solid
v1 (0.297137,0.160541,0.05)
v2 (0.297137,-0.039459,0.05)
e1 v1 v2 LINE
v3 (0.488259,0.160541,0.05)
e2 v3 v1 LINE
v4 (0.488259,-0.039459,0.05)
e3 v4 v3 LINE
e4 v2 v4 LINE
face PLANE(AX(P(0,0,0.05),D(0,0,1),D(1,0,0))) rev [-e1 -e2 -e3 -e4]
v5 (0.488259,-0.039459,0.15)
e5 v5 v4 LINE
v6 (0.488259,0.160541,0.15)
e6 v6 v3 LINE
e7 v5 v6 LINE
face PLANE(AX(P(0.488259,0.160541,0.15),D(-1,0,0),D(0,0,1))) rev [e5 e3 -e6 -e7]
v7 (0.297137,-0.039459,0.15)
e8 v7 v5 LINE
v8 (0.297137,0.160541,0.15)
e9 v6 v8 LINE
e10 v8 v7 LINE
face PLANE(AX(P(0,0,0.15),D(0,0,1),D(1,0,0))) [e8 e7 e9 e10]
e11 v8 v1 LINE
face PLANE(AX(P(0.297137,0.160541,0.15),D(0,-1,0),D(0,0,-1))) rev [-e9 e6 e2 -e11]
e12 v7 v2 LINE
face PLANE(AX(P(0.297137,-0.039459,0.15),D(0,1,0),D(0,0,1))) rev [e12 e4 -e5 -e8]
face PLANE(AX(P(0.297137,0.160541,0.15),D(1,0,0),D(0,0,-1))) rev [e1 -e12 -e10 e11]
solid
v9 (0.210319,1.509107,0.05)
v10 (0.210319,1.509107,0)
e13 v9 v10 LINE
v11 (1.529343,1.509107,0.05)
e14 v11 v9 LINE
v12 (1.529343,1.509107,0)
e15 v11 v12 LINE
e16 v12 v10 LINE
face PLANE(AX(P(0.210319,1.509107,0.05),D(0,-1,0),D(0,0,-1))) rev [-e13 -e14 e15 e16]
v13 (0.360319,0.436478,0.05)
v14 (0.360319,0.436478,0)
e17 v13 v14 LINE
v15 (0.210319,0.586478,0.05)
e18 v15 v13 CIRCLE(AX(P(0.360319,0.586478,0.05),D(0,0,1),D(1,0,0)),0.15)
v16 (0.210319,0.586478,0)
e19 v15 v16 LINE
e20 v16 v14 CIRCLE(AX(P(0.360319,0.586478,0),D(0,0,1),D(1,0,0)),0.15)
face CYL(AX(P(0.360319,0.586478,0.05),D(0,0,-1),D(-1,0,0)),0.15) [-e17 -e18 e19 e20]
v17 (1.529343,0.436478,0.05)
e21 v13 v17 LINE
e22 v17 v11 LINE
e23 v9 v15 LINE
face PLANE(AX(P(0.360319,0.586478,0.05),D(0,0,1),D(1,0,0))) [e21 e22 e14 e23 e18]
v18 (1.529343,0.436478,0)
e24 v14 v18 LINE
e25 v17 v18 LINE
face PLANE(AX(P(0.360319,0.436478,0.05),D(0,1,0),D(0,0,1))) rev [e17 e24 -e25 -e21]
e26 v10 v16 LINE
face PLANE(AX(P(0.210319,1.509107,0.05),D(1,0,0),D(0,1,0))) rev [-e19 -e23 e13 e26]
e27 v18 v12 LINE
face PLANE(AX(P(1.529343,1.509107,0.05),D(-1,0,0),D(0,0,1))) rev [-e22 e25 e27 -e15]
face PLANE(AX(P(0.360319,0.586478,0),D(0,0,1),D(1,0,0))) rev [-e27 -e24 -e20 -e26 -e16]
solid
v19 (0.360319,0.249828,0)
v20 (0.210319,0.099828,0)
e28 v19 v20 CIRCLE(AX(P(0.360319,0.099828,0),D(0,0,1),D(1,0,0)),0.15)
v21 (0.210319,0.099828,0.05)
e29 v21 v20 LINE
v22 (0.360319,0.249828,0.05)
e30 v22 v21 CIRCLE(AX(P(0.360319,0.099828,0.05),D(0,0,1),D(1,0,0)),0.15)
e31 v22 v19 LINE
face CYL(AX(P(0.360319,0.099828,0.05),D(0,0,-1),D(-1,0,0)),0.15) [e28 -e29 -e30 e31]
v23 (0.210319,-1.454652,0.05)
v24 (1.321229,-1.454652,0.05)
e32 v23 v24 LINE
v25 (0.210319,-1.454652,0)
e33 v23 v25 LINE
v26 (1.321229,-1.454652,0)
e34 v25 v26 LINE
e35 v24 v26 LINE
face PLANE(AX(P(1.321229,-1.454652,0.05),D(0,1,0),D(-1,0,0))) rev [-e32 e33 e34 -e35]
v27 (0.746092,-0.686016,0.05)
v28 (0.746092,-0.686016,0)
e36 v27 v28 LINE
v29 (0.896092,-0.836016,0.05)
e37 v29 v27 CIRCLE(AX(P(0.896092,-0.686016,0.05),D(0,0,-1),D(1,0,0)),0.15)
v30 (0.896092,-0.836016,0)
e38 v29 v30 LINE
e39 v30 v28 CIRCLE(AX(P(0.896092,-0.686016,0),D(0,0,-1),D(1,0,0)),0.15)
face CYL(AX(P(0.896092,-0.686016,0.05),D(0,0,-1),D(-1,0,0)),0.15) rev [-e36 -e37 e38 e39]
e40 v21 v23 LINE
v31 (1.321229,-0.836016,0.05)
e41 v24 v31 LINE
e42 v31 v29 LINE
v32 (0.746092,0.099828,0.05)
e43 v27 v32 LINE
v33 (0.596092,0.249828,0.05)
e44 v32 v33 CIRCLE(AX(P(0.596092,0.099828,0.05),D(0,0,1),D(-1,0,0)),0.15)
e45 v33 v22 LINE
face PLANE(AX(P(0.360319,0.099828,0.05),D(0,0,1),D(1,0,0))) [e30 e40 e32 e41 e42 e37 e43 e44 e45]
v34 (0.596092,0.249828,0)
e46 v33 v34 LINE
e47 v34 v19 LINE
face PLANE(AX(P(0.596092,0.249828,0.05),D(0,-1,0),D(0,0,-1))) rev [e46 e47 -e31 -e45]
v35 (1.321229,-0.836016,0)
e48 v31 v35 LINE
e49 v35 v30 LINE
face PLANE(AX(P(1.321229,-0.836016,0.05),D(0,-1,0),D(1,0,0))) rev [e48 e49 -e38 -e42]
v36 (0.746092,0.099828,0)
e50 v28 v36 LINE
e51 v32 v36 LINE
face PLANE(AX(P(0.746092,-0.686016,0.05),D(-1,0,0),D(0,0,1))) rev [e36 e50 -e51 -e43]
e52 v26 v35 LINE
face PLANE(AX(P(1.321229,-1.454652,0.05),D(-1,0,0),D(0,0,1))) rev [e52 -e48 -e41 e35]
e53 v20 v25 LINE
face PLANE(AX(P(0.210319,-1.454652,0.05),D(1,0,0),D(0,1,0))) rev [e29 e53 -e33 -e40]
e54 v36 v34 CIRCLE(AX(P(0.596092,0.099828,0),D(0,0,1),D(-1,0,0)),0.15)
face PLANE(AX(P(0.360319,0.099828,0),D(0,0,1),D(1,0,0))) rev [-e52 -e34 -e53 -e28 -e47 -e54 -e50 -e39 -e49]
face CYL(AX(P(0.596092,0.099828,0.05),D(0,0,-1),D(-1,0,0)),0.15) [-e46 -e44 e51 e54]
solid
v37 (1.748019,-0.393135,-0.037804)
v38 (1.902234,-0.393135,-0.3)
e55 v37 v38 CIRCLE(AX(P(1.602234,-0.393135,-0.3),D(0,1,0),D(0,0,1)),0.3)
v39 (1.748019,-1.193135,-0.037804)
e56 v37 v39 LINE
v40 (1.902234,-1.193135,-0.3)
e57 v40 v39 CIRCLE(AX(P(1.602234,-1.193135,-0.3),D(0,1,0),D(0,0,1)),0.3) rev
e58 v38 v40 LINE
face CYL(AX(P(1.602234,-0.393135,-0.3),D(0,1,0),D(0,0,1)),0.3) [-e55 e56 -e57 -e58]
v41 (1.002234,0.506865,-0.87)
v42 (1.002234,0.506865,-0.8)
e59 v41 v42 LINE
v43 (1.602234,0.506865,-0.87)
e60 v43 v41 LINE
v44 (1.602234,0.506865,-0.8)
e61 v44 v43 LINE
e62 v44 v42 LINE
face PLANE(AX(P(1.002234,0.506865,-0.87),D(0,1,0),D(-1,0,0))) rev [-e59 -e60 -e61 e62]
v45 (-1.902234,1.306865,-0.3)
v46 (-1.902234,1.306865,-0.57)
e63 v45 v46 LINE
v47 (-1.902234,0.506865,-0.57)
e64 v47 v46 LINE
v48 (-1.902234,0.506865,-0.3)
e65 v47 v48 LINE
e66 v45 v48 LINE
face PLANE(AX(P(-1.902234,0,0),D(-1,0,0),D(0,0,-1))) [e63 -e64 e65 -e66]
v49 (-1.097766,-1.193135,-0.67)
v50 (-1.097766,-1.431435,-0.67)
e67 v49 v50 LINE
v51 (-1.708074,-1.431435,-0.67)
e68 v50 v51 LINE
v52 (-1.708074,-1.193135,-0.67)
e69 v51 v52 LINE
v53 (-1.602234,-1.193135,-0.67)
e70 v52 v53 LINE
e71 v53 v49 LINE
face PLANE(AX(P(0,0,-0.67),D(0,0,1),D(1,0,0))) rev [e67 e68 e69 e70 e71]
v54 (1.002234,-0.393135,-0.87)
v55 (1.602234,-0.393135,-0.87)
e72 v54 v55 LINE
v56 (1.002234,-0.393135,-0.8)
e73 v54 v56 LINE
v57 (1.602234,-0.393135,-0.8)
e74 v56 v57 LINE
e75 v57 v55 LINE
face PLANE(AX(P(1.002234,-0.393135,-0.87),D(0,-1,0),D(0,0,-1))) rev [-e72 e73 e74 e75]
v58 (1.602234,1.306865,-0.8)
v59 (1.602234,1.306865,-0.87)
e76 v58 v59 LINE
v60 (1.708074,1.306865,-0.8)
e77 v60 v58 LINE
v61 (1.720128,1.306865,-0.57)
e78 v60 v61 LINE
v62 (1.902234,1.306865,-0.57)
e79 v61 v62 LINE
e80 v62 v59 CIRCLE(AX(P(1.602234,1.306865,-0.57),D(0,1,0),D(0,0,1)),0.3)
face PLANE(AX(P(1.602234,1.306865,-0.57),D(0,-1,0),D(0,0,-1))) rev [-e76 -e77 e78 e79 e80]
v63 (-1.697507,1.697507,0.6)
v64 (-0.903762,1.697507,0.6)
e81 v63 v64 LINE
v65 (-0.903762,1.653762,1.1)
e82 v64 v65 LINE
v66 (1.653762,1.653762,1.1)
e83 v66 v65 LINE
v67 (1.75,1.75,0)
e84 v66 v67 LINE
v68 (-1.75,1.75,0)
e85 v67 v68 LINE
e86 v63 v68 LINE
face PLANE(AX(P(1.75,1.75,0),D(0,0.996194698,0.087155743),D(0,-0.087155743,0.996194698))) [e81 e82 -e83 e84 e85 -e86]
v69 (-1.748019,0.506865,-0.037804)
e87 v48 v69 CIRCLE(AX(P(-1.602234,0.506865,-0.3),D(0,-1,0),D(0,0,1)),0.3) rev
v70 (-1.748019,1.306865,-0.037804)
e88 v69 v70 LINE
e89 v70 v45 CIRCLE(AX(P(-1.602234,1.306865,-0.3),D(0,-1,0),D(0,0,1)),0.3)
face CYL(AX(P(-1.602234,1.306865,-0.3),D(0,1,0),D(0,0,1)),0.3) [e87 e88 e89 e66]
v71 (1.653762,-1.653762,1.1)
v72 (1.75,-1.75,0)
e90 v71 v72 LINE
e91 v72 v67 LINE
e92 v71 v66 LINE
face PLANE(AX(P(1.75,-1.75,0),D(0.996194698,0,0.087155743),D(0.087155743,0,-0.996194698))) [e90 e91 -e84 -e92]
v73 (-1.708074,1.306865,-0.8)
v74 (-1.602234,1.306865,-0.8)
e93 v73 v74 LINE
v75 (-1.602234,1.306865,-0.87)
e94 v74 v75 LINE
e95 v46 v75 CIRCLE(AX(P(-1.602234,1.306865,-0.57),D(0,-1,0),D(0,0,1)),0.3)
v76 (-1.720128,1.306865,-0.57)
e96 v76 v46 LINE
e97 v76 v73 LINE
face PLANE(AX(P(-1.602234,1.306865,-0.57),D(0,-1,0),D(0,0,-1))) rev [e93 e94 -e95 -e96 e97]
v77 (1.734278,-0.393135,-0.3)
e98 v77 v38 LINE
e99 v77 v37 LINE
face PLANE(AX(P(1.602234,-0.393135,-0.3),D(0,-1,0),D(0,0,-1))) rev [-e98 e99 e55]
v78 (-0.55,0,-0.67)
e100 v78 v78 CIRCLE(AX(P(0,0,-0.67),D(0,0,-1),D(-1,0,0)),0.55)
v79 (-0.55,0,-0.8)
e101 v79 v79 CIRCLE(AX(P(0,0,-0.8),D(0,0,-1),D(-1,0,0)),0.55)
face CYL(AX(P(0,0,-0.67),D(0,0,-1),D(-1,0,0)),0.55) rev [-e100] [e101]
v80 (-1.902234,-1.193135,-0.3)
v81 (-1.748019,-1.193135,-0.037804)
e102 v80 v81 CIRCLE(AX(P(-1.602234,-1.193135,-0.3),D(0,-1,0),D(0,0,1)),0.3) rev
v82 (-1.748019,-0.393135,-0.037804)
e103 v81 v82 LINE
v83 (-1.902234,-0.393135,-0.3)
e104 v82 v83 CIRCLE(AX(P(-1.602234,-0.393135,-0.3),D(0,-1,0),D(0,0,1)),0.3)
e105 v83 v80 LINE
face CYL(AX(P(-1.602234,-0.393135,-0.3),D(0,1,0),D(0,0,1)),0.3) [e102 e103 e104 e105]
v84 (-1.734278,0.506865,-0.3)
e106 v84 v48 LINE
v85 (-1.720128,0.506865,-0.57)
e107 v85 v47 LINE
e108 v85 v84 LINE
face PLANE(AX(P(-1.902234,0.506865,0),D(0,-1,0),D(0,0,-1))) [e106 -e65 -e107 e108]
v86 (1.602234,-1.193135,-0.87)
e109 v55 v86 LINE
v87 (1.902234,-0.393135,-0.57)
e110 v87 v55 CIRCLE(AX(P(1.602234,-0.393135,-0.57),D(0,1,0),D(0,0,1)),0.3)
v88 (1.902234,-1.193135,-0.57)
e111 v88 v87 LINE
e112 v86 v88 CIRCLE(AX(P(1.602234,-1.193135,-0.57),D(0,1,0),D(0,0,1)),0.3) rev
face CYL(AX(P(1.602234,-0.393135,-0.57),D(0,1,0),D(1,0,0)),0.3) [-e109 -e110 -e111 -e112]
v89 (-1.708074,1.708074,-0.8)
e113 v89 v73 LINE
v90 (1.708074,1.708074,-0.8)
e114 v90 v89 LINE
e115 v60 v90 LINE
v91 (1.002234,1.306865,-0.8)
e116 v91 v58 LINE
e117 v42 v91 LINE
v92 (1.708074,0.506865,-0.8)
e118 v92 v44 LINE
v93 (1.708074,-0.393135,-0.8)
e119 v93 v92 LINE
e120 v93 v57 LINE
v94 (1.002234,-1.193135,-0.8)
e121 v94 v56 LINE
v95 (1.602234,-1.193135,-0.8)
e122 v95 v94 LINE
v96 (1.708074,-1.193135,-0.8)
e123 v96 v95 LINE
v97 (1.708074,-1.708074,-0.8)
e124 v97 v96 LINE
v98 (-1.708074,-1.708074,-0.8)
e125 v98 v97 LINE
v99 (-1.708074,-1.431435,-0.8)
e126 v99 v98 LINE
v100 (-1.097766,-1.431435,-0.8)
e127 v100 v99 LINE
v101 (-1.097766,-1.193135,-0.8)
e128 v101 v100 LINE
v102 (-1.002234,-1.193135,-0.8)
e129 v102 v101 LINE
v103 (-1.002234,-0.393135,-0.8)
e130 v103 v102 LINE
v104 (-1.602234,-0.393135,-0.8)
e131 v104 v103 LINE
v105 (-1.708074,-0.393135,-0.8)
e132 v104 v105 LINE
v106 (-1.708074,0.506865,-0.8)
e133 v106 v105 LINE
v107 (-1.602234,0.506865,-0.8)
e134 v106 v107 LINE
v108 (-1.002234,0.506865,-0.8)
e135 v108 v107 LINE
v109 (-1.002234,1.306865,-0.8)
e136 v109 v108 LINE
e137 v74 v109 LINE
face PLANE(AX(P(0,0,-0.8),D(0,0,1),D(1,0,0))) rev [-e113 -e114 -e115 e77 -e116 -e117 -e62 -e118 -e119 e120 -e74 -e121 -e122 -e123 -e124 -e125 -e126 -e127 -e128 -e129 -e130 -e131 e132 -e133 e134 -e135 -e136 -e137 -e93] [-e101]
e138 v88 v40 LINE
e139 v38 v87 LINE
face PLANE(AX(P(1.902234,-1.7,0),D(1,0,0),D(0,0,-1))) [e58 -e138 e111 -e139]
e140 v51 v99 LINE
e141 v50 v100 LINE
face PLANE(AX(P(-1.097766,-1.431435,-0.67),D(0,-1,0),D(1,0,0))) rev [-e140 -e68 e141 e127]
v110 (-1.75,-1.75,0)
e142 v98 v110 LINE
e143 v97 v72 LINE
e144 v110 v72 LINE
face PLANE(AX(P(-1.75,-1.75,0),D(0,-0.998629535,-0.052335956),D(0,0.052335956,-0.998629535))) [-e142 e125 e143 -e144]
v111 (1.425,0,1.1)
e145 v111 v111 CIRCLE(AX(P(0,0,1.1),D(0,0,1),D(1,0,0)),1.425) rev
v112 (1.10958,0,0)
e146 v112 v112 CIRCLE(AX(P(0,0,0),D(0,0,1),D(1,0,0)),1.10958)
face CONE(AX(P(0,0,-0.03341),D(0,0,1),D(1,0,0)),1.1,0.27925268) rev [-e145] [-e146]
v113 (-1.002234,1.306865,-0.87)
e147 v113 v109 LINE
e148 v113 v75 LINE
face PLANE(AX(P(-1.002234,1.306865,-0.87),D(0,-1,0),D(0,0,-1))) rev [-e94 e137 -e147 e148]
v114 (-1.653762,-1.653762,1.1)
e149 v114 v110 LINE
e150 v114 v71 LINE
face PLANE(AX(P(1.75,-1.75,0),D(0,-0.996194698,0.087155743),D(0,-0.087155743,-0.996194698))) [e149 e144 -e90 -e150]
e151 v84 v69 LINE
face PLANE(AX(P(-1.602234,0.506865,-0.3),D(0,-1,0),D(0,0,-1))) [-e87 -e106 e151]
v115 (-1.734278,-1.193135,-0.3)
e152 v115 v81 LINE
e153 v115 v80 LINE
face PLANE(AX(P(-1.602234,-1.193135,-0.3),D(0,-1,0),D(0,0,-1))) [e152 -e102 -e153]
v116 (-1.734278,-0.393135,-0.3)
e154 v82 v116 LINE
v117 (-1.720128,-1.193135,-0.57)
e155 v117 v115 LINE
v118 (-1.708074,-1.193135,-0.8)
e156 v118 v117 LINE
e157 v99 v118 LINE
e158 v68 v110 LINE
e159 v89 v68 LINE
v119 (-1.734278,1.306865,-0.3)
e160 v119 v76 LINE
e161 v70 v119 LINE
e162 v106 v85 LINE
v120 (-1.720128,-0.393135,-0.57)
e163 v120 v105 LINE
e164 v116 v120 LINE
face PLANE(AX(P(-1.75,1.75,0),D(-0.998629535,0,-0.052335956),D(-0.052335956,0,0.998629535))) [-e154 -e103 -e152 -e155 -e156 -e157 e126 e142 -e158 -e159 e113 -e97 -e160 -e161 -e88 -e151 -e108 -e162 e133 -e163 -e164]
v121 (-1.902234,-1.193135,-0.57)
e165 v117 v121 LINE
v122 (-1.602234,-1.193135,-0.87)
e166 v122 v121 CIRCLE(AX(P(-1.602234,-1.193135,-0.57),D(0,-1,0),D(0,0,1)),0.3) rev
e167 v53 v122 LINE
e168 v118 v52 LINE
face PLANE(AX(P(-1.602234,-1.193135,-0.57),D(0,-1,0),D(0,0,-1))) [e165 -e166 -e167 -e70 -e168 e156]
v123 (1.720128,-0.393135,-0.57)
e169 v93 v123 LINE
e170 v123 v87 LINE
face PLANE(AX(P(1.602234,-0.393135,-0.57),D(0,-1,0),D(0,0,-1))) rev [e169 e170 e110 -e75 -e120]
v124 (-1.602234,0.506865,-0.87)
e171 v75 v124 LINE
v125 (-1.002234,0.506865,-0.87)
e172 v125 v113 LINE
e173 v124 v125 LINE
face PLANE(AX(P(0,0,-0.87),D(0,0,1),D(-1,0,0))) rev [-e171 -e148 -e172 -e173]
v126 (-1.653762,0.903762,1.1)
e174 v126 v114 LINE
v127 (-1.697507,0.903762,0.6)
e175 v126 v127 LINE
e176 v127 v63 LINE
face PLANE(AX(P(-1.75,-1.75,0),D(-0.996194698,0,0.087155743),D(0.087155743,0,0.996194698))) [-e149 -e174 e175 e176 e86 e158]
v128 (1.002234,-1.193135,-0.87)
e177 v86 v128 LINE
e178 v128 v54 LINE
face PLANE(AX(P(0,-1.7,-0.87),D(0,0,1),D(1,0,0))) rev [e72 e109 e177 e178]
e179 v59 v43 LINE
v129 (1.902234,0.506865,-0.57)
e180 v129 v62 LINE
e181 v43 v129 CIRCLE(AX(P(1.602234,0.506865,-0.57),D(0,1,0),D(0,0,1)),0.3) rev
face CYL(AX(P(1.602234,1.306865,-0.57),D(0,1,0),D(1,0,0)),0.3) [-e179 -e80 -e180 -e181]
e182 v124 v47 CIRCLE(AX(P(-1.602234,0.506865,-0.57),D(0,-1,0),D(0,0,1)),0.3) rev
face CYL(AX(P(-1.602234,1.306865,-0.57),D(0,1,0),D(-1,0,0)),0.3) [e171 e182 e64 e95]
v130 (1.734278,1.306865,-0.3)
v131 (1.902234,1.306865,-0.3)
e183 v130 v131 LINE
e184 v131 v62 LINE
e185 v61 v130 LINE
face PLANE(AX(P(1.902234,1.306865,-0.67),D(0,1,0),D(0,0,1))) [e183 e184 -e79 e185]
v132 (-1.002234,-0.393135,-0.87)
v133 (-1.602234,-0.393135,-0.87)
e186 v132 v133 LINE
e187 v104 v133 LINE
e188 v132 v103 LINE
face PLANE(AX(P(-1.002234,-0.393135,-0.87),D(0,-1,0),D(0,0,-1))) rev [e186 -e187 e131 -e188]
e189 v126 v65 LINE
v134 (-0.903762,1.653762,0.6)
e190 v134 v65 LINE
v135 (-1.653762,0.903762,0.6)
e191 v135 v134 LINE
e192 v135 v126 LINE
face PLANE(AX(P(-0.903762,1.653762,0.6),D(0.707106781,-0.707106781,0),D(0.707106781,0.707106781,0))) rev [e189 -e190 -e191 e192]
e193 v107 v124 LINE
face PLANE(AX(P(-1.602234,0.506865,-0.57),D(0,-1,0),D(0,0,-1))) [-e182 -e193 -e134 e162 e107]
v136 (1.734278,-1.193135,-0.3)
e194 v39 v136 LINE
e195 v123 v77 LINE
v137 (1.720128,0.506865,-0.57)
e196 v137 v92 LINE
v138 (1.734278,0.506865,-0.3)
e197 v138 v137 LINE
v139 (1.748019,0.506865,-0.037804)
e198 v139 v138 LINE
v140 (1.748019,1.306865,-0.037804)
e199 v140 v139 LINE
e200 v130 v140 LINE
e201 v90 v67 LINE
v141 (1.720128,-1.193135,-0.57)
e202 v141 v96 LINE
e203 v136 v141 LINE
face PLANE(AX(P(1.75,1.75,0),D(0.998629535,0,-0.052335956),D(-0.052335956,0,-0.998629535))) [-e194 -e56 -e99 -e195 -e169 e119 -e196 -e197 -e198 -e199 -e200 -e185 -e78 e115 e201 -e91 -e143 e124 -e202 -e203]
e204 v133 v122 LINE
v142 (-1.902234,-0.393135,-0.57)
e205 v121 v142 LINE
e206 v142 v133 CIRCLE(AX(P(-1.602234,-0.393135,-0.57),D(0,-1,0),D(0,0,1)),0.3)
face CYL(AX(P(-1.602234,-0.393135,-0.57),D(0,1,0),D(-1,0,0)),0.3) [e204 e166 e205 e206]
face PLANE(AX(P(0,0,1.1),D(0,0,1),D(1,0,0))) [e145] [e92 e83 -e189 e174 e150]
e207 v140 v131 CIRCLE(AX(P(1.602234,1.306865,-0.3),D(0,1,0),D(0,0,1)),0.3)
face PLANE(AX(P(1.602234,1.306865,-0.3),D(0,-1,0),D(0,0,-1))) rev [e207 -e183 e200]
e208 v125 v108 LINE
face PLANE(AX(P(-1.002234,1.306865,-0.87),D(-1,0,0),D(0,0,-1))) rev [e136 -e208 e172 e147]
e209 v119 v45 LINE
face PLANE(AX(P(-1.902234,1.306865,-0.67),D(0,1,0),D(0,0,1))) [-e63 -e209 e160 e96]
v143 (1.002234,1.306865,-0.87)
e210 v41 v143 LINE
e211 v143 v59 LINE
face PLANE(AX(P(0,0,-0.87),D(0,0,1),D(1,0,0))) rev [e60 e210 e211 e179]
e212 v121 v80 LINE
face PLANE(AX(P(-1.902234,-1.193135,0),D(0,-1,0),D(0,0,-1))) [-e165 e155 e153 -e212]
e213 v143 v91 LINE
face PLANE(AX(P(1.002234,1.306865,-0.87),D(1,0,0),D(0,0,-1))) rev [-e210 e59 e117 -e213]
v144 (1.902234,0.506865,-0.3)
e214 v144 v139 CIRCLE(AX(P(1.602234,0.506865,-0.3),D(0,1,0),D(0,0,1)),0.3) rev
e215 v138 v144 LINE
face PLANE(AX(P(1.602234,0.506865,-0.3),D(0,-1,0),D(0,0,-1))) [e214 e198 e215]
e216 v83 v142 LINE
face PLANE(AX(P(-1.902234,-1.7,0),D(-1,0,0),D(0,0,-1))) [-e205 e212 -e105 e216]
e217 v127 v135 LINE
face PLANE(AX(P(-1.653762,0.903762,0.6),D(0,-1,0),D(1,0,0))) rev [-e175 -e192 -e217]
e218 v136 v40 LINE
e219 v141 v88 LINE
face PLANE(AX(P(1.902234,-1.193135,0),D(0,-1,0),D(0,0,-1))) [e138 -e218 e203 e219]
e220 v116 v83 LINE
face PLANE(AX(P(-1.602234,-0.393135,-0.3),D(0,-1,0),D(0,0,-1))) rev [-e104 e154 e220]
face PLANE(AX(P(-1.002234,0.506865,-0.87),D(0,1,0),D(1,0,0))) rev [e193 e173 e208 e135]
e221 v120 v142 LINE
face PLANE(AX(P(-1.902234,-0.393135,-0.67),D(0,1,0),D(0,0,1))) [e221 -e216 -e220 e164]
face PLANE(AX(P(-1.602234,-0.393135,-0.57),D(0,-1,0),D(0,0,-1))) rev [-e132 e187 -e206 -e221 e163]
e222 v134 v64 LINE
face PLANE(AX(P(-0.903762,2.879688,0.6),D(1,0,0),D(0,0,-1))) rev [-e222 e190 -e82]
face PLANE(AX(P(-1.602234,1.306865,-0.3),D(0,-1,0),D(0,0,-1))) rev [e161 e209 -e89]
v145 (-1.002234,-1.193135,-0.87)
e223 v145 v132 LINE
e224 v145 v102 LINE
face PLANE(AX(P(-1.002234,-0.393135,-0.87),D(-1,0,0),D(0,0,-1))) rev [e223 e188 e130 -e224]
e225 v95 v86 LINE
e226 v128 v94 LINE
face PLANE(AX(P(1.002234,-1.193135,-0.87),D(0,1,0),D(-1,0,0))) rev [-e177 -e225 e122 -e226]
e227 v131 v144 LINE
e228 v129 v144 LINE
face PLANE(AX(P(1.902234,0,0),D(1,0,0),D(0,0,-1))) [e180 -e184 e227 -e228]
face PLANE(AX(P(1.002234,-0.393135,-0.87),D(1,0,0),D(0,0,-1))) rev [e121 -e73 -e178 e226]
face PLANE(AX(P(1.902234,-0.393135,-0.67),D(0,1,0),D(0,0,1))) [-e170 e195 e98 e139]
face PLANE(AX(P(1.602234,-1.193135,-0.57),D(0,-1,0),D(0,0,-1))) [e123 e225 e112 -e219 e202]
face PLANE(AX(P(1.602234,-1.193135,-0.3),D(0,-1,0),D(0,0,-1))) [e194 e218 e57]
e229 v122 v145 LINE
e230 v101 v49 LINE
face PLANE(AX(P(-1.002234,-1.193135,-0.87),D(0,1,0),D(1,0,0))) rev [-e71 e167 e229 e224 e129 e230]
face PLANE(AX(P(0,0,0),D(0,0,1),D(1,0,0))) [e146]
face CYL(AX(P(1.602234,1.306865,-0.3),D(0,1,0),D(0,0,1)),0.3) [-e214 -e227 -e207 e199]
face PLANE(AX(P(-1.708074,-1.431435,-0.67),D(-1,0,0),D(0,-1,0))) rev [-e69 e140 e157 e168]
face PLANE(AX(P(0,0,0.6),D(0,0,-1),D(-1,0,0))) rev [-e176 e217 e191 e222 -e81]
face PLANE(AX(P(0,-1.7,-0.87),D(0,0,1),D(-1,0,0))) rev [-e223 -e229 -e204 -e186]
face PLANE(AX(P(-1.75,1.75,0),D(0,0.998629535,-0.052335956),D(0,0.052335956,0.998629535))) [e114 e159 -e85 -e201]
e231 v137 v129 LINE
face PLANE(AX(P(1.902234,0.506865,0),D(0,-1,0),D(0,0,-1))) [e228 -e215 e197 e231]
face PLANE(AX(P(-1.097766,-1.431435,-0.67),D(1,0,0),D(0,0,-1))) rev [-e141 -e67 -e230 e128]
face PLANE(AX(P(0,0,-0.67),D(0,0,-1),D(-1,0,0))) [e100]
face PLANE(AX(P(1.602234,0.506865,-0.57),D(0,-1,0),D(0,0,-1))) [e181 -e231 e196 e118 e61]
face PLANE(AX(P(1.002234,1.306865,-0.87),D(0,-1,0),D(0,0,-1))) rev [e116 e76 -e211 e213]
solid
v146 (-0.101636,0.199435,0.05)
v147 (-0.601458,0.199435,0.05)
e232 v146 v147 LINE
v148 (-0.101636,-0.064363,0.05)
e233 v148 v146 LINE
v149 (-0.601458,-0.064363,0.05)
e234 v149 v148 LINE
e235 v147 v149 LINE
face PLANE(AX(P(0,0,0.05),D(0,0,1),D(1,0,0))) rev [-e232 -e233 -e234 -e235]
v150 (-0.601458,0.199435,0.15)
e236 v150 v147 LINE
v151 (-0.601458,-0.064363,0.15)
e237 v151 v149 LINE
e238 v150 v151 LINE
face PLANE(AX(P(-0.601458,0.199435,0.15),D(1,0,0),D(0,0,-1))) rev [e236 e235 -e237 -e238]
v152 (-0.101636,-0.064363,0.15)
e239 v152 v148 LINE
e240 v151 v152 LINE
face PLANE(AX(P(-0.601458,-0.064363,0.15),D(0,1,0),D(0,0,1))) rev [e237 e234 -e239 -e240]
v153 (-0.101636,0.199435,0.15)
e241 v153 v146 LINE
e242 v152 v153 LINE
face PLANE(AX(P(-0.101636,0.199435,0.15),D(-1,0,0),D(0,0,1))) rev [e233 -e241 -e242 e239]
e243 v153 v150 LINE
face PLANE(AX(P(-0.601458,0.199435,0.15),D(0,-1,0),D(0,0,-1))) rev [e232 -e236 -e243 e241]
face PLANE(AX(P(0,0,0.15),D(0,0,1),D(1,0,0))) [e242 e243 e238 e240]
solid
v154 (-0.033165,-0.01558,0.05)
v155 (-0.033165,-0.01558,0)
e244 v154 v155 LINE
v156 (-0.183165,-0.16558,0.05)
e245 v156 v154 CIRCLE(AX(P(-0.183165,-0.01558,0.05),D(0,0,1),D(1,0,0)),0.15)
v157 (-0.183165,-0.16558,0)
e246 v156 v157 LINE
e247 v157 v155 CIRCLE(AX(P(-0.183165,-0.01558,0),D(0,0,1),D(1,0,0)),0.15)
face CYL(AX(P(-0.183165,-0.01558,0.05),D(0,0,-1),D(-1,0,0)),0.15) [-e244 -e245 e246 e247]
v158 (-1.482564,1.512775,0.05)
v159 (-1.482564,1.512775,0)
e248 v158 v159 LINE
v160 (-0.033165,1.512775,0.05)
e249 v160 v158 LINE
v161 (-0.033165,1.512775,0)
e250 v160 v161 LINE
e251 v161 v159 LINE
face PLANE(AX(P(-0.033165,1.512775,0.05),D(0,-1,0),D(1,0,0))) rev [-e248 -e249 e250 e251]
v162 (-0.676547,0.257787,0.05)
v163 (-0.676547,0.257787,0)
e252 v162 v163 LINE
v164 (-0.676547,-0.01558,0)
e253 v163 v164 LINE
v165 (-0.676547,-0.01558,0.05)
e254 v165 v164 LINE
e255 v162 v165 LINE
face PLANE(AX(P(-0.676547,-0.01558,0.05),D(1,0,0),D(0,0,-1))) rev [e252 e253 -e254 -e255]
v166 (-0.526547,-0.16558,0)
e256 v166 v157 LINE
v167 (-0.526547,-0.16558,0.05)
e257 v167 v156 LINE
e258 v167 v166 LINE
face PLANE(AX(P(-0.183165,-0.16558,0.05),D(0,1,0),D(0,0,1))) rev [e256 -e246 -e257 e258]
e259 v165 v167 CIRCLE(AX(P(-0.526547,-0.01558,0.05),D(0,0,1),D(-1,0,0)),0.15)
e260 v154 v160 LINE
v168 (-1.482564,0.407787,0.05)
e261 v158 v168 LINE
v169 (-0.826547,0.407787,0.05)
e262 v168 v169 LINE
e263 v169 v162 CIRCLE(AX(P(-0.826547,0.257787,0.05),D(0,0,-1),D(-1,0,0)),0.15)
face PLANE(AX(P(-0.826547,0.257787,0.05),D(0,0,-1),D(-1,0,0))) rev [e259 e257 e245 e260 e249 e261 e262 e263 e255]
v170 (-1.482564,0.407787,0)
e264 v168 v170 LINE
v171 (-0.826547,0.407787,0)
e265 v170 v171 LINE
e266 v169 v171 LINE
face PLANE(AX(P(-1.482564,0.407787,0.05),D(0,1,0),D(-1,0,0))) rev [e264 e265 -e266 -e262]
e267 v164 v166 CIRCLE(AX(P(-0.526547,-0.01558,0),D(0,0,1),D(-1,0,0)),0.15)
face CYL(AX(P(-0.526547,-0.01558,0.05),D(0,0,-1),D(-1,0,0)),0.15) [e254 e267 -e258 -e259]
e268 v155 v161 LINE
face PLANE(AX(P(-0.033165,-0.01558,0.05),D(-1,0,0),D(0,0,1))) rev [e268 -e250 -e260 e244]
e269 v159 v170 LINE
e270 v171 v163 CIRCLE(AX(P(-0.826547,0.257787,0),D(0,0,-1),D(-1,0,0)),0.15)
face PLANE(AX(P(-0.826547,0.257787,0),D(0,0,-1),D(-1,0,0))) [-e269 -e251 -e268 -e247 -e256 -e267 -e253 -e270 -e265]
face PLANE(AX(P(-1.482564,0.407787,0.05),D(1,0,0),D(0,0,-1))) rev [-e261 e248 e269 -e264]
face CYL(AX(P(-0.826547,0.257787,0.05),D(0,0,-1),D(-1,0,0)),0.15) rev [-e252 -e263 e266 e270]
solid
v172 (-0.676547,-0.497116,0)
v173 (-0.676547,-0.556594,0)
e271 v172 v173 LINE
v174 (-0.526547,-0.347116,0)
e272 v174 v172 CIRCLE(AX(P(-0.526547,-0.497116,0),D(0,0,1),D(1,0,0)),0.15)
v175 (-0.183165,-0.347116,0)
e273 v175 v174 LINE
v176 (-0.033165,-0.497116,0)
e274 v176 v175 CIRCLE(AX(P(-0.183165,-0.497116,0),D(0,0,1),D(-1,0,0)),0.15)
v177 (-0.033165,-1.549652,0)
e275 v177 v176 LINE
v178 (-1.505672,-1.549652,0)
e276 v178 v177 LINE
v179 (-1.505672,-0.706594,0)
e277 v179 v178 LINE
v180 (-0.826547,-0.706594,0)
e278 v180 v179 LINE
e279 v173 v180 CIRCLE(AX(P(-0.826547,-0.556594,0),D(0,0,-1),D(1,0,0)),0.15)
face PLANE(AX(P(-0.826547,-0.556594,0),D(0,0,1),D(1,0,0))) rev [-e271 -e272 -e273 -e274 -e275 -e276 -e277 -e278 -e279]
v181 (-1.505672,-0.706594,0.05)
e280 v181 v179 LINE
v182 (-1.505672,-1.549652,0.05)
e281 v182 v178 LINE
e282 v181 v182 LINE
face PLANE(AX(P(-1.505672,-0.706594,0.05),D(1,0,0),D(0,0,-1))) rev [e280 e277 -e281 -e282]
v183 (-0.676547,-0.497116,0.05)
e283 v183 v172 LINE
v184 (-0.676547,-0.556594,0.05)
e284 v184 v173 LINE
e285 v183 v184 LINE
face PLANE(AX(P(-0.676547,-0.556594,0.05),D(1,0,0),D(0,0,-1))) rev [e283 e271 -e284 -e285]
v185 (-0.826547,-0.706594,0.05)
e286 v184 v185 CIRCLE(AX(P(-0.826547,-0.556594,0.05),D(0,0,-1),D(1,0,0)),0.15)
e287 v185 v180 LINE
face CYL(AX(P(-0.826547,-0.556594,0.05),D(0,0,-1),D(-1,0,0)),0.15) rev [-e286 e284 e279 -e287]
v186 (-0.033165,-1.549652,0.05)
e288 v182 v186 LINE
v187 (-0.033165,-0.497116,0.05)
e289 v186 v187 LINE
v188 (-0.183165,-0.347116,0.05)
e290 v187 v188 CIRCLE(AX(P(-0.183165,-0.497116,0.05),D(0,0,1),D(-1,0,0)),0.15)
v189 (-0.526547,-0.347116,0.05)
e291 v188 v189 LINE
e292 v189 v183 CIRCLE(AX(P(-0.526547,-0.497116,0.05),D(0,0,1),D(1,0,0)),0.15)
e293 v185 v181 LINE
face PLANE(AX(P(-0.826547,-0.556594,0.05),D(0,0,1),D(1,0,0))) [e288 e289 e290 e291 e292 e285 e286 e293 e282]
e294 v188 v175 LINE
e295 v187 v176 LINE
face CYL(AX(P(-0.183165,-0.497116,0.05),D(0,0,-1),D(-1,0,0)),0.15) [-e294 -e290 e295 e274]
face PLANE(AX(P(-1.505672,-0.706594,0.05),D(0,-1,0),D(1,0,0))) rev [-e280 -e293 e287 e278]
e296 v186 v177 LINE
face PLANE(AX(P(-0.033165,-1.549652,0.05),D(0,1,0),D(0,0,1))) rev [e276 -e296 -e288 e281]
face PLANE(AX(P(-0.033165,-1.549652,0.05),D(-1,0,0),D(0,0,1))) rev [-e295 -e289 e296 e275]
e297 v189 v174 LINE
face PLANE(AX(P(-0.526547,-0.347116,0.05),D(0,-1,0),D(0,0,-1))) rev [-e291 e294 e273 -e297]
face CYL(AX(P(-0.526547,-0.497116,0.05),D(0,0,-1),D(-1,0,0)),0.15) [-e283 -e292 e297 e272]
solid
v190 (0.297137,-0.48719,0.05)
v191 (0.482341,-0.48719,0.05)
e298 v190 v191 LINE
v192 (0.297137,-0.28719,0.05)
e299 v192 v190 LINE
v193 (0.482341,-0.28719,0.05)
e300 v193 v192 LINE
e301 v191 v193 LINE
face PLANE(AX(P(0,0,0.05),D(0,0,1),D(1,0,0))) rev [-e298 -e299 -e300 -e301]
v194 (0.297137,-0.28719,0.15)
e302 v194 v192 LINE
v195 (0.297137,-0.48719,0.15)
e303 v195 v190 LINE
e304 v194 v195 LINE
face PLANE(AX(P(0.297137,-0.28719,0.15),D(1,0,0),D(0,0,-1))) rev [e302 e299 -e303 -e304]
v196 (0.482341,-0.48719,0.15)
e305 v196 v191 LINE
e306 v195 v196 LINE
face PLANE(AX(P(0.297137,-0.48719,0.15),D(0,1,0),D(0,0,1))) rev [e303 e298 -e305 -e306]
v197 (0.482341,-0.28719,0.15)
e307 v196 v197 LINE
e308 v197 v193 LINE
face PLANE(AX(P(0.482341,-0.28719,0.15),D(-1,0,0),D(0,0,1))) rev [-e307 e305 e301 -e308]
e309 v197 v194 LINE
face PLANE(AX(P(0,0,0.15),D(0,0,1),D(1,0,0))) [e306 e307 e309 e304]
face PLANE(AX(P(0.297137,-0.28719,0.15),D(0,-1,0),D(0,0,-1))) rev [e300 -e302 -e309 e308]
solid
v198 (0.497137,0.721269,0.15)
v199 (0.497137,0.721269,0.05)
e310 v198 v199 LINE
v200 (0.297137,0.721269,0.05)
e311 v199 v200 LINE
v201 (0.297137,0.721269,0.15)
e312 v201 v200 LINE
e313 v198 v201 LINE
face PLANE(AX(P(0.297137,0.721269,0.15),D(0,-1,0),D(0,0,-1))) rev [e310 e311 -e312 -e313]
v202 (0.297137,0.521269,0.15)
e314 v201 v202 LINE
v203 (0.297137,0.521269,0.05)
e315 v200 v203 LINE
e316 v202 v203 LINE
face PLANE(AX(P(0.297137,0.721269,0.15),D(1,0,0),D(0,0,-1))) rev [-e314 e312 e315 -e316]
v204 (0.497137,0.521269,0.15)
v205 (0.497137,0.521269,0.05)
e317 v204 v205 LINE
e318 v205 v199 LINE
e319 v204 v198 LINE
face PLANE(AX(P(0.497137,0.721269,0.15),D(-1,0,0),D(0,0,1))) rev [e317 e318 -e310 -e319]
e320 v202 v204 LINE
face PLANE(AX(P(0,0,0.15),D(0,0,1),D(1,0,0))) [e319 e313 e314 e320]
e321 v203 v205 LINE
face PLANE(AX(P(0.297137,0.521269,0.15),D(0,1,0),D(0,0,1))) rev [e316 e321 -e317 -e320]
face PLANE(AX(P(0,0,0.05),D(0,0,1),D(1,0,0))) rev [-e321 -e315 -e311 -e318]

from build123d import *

# Parameters (mm, degrees)
SKETCH_1_W                       = 3.5
SKETCH_1_H                       = 3.5
EXTRUDE_1_DEPTH                  = 0.8
EXTRUDE_1_DRAFT                  = -3
SKETCH_3_R                       = 0.55
SKETCH_3_W                       = 0.705840171
SKETCH_3_H                       = 0.8
SKETCH_3_W_2                     = 0.610307383
CUT_EXTRUDE_1_DEPTH              = 0.13
SKETCH_5_W                       = 0.7
SKETCH_5_H                       = 0.8
SM_BASE_FLANGE_1_DEPTH           = 0.2
SM_EDGE_FLANGE_1_STRIP_W         = 1
SM_EDGE_FLANGE_1_STRIP_H         = 0.2
SM_EDGE_FLANGE_1_STRIP_CUT_DEPTH = 0.8
SM_EDGE_FLANGE_1_DEPTH           = 0.8
SM_EDGE_FLANGE_2_STRIP_W         = 1
SM_EDGE_FLANGE_2_STRIP_H         = 0.2
SM_EDGE_FLANGE_2_STRIP_CUT_DEPTH = 0.8
SM_EDGE_FLANGE_2_DEPTH           = 0.8
PATTERN_LINEAR_1_COUNT           = 2
PATTERN_LINEAR_1_PITCH           = 1.7
SKETCH_30_W                      = 3.5
SKETCH_30_H                      = 3.5
EXTRUDE_3_DEPTH                  = 1.1
EXTRUDE_3_TAPER                  = 5
CUT_EXTRUDE_2_DEPTH              = 0.5
SKETCH_34_R                      = 1.1
CUT_EXTRUDE_3_DEPTH              = 1.1
CHAMFER_1_SIZE                   = 0.325
CHAMFER_1_SIZE_2                 = 1.133409694
EXTRUDE_4_DEPTH                  = 0.05
EXTRUDE_4_2_DEPTH                = 0.05
EXTRUDE_4_3_DEPTH                = 0.05
EXTRUDE_4_4_DEPTH                = 0.05
SKETCH_49_W                      = 0.499821424
SKETCH_49_H                      = 0.263797991
EXTRUDE_5_DEPTH                  = 0.1
SKETCH_49_W_2                    = 0.2
SKETCH_49_H_2                    = 0.2
EXTRUDE_5_2_DEPTH                = 0.1
SKETCH_49_W_3                    = 0.191122393
EXTRUDE_5_3_DEPTH                = 0.1
SKETCH_49_W_4                    = 0.185203988
EXTRUDE_5_4_DEPTH                = 0.1


# Sheet-metal steps are written as plain solids
with BuildPart() as part:
    # Sketch 1 → Бобышка-Вытянуть1 (with draft: the straight prism first)
    with BuildSketch(Plane.XY):
        Rectangle(SKETCH_1_W, SKETCH_1_H)
    extrude(amount=-EXTRUDE_1_DEPTH)
    # Бобышка-Вытянуть1: the draft: its side faces are tilted about the plane it starts from
    extrude_1_sides = [part.faces().sort_by_distance(p)[0] for p in [
        (-1.75, 0, -0.4),
        (0, -1.75, -0.4),
        (1.75, 0, -0.4),
        (0, 1.75, -0.4),
    ]]
    draft(extrude_1_sides, Plane.XY, EXTRUDE_1_DRAFT)

    # Sketch 3 → Вырез-Вытянуть1 (cut)
    with BuildSketch(Plane(origin=(0, 0, -0.8), x_dir=(-1, 0, 0), z_dir=(0, 0, -1))):
        Circle(SKETCH_3_R)
        with Locations((-1.355153691, 0.906864755)):
            Rectangle(SKETCH_3_W, SKETCH_3_H)
        with Locations((1.402920085, 0.906864755)):
            Rectangle(SKETCH_3_W_2, SKETCH_3_H)
        with Locations((-1.355153691, -0.793135245)):
            Rectangle(SKETCH_3_W, SKETCH_3_H)
        with Locations((1.402920085, -1.031434947)):
            Rectangle(SKETCH_3_W_2, SKETCH_3_H)
    extrude(amount=-CUT_EXTRUDE_1_DEPTH, mode=Mode.SUBTRACT)



with BuildPart() as body_2:
    # Sketch 5 → Базовая кромка1 (new body)
    with BuildSketch(Plane(origin=(0, 0, -0.67), x_dir=(-1, 0, 0), z_dir=(0, 0, -1))):
        with Locations((-1.352233606, 0.906864755)):
            Rectangle(SKETCH_5_W, SKETCH_5_H)
    extrude(amount=SM_BASE_FLANGE_1_DEPTH)

    # Ребро-кромка1 strip (across the edge) → Ребро-кромка1 strip cut (cut)
    with BuildSketch(Plane(origin=(1.702233606, 0.506864755, -0.67), x_dir=(-1, 0, 0), z_dir=(0, 1, 0))):
        with Locations((-0.4, -0.1)):
            Rectangle(SM_EDGE_FLANGE_1_STRIP_W, SM_EDGE_FLANGE_1_STRIP_H)
    extrude(amount=SM_EDGE_FLANGE_1_STRIP_CUT_DEPTH, mode=Mode.SUBTRACT)

    # Ребро-кромка1 section (across the edge) → Ребро-кромка1 (add)
    with BuildSketch(Plane(origin=(1.702233606, 0.506864755, -0.67), x_dir=(-1, 0, 0), z_dir=(0, 1, 0))):
        with BuildLine():
            Line((-0.2, 0.1), (-0.2, 0.67))
            Line((-0.2, 0.67), (0, 0.67))
            Line((0, 0.67), (0, 0.1))
            ThreePointArc((0, 0.1), (0.029289322, 0.029289322), (0.1, 0))
            Line((0.1, 0), (0.1, -0.2))
            ThreePointArc((0.1, -0.2), (-0.112132034, -0.112132034), (-0.2, 0.1))
        make_face()
    extrude(amount=SM_EDGE_FLANGE_1_DEPTH)

    # Ребро-кромка2 strip (across the edge) → Ребро-кромка2 strip cut (cut)
    with BuildSketch(Plane(origin=(1.702233606, 0.506864755, 0), x_dir=(0, 0, -1), z_dir=(0, 1, 0))):
        with Locations((-0.2, -0.1)):
            Rectangle(SM_EDGE_FLANGE_2_STRIP_W, SM_EDGE_FLANGE_2_STRIP_H)
    extrude(amount=SM_EDGE_FLANGE_2_STRIP_CUT_DEPTH, mode=Mode.SUBTRACT)

    # Ребро-кромка2 section (across the edge) → Ребро-кромка2 (add)
    with BuildSketch(Plane(origin=(1.702233606, 0.506864755, 0), x_dir=(0, 0, -1), z_dir=(0, 1, 0))):
        with BuildLine():
            Line((0, 0.1), (0, 0.4))
            Line((0, 0.4), (0.2, 0.4))
            Line((0.2, 0.4), (0.2, 0.1))
            ThreePointArc((0.2, 0.1), (0.229289322, 0.029289322), (0.3, 0))
            Line((0.3, 0), (0.3, -0.2))
            ThreePointArc((0.3, -0.2), (0.087867966, -0.112132034), (0, 0.1))
        make_face()
    extrude(amount=SM_EDGE_FLANGE_2_DEPTH)


with BuildPart() as pattern_linear_1_1:
    # Линейный массив1: pattern copy
    add(body_2.part.moved(Location(Vector(0, -1, 0) * (1 * PATTERN_LINEAR_1_PITCH))))


with BuildPart() as body_4:
    # Зеркальное отражение1: mirrored copy
    add(body_2.part.mirror(Plane(origin=(0, 0, 0), x_dir=(0, 0, 1), z_dir=(1, 0, 0))))


with BuildPart() as body_5:
    # Mirror 1 2: mirrored copy
    add(pattern_linear_1_1.part.mirror(Plane(origin=(0, 0, 0), x_dir=(0, 0, 1), z_dir=(1, 0, 0))))


with BuildPart() as part_1:
    add(part.part)

    add(body_2.part)  # Бобышка-Вытянуть3 merges body 2

    add(pattern_linear_1_1.part)  # Бобышка-Вытянуть3 merges Линейный массив1_1

    add(body_4.part)  # Бобышка-Вытянуть3 merges body 4

    add(body_5.part)  # Бобышка-Вытянуть3 merges body 5
    # Эскиз30 → Бобышка-Вытянуть3 (add)
    with BuildSketch(Plane.XY):
        Rectangle(SKETCH_30_W, SKETCH_30_H)
    extrude(amount=EXTRUDE_3_DEPTH, taper=EXTRUDE_3_TAPER)

    # Эскиз33 → Вырез-Вытянуть2 (cut)
    with BuildSketch(Plane.XY.offset(1.1)):
        Polygon((-0.90376247, 1.65376247), (-1.65376247, 0.90376247), (-2.879687624, 0.90376247), (-2.879687624, 2.879687624), (-0.90376247, 2.879687624), align=None)
    extrude(amount=-CUT_EXTRUDE_2_DEPTH, mode=Mode.SUBTRACT)

    # Эскиз34 → Вырез-Вытянуть3 (cut)
    with BuildSketch(Plane.XY.offset(1.1)):
        Circle(SKETCH_34_R)
    extrude(amount=-CUT_EXTRUDE_3_DEPTH, mode=Mode.SUBTRACT)

    # Фаска1
    # the kernel refuses this chamfer: 1.133409694, 0.325 mm, written as the material it takes off along each edge
    with BuildSketch(Plane(origin=(0, 0, 1.1), x_dir=(1, 0, 0), z_dir=(0, -1, 0))) as chamfer_1_piece_1_section:
        Polygon((1.1 + CHAMFER_1_SIZE, 0), (1.1, -CHAMFER_1_SIZE_2), (1.1, 0), align=None)
    chamfer_1_piece_1 = revolve(axis=Axis((0, 0, 1.1), (0, 0, 1)), mode=Mode.PRIVATE)
    chamfer_1_piece_1 = split(chamfer_1_piece_1, bisect_by=Plane(origin=(-1.262154842, 0, 0), z_dir=(0, 0, 1)), keep=Keep.TOP, mode=Mode.PRIVATE)
    add(chamfer_1_piece_1, mode=Mode.SUBTRACT)


with BuildPart() as body_2_2:
    # Эскиз48 → Бобышка-Вытянуть4 (new body)
    with BuildSketch(Plane.XY):
        with BuildLine():
            Line((0.210318716, -1.45465193), (0.210318716, 0.099827842))
            ThreePointArc((0.210318716, 0.099827842), (0.254252699, 0.205893859), (0.360318716, 0.249827842))
            Line((0.360318716, 0.249827842), (0.596091857, 0.249827842))
            ThreePointArc((0.596091857, 0.249827842), (0.702157875, 0.205893859), (0.746091857, 0.099827842))
            Line((0.746091857, 0.099827842), (0.746091857, -0.686015987))
            ThreePointArc((0.746091857, -0.686015987), (0.79002584, -0.792082004), (0.896091857, -0.836015987))
            Line((0.896091857, -0.836015987), (1.321228911, -0.836015987))
            Line((1.321228911, -0.836015987), (1.321228911, -1.45465193))
            Line((1.321228911, -1.45465193), (0.210318716, -1.45465193))
        make_face()
    extrude(amount=EXTRUDE_4_DEPTH)


with BuildPart() as body_3:
    # Эскиз48 → Extrude 4 2 (new body)
    with BuildSketch(Plane.XY):
        with BuildLine():
            Line((0.210318716, 1.509106996), (1.529342803, 1.509106996))
            Line((1.529342803, 1.509106996), (1.529342803, 0.436478181))
            Line((1.529342803, 0.436478181), (0.360318716, 0.436478181))
            ThreePointArc((0.360318716, 0.436478181), (0.254252699, 0.480412163), (0.210318716, 0.586478181))
            Line((0.210318716, 0.586478181), (0.210318716, 1.509106996))
        make_face()
    extrude(amount=EXTRUDE_4_2_DEPTH)


with BuildPart() as body_4_2:
    # Эскиз48 → Extrude 4 3 (new body)
    with BuildSketch(Plane.XY):
        with BuildLine():
            Line((-0.033165046, -1.549652247), (-0.033165046, -0.49711606))
            ThreePointArc((-0.033165046, -0.49711606), (-0.077099029, -0.391050043), (-0.183165046, -0.34711606))
            Line((-0.183165046, -0.34711606), (-0.526546559, -0.34711606))
            ThreePointArc((-0.526546559, -0.34711606), (-0.632612577, -0.391050043), (-0.676546559, -0.49711606))
            Line((-0.676546559, -0.49711606), (-0.676546559, -0.556593928))
            ThreePointArc((-0.676546559, -0.556593928), (-0.720480542, -0.662659945), (-0.826546559, -0.706593928))
            Line((-0.826546559, -0.706593928), (-1.505672411, -0.706593928))
            Line((-1.505672411, -0.706593928), (-1.505672411, -1.549652247))
            Line((-1.505672411, -1.549652247), (-0.033165046, -1.549652247))
        make_face()
    extrude(amount=EXTRUDE_4_3_DEPTH)


with BuildPart() as body_5_2:
    # Эскиз48 → Extrude 4 4 (new body)
    with BuildSketch(Plane.XY):
        with BuildLine():
            Line((-0.033165046, 1.512774786), (-1.482564226, 1.512774786))
            Line((-1.482564226, 1.512774786), (-1.482564226, 0.407787462))
            Line((-1.482564226, 0.407787462), (-0.826546559, 0.407787462))
            ThreePointArc((-0.826546559, 0.407787462), (-0.720480542, 0.363853479), (-0.676546559, 0.257787462))
            Line((-0.676546559, 0.257787462), (-0.676546559, -0.015579737))
            ThreePointArc((-0.676546559, -0.015579737), (-0.632612577, -0.121645754), (-0.526546559, -0.165579737))
            Line((-0.526546559, -0.165579737), (-0.183165046, -0.165579737))
            ThreePointArc((-0.183165046, -0.165579737), (-0.077099029, -0.121645754), (-0.033165046, -0.015579737))
            Line((-0.033165046, -0.015579737), (-0.033165046, 1.512774786))
        make_face()
    extrude(amount=EXTRUDE_4_4_DEPTH)


with BuildPart() as body_6:
    # Эскиз49 → Бобышка-Вытянуть5 (new body)
    with BuildSketch(Plane.XY.offset(0.05)):
        with Locations((-0.351547158, 0.067536346)):
            Rectangle(SKETCH_49_W, SKETCH_49_H)
    extrude(amount=EXTRUDE_5_DEPTH)


with BuildPart() as body_7:
    # Эскиз49 → Extrude 5 2 (new body)
    with BuildSketch(Plane.XY.offset(0.05)):
        with Locations((0.397136578, 0.621269056)):
            Rectangle(SKETCH_49_W_2, SKETCH_49_H_2)
    extrude(amount=EXTRUDE_5_2_DEPTH)


with BuildPart() as body_8:
    # Эскиз49 → Extrude 5 3 (new body)
    with BuildSketch(Plane.XY.offset(0.05)):
        with Locations((0.392697775, 0.060540571)):
            Rectangle(SKETCH_49_W_3, SKETCH_49_H_2)
    extrude(amount=EXTRUDE_5_3_DEPTH)


with BuildPart() as body_9:
    # Эскиз49 → Extrude 5 4 (new body)
    with BuildSketch(Plane.XY.offset(0.05)):
        with Locations((0.389738572, -0.387189749)):
            Rectangle(SKETCH_49_W_4, SKETCH_49_H_2)
    extrude(amount=EXTRUDE_5_4_DEPTH)


solid = Compound([part_1.part, body_2_2.part, body_3.part, body_4_2.part, body_5_2.part, body_6.part, body_7.part, body_8.part, body_9.part])
